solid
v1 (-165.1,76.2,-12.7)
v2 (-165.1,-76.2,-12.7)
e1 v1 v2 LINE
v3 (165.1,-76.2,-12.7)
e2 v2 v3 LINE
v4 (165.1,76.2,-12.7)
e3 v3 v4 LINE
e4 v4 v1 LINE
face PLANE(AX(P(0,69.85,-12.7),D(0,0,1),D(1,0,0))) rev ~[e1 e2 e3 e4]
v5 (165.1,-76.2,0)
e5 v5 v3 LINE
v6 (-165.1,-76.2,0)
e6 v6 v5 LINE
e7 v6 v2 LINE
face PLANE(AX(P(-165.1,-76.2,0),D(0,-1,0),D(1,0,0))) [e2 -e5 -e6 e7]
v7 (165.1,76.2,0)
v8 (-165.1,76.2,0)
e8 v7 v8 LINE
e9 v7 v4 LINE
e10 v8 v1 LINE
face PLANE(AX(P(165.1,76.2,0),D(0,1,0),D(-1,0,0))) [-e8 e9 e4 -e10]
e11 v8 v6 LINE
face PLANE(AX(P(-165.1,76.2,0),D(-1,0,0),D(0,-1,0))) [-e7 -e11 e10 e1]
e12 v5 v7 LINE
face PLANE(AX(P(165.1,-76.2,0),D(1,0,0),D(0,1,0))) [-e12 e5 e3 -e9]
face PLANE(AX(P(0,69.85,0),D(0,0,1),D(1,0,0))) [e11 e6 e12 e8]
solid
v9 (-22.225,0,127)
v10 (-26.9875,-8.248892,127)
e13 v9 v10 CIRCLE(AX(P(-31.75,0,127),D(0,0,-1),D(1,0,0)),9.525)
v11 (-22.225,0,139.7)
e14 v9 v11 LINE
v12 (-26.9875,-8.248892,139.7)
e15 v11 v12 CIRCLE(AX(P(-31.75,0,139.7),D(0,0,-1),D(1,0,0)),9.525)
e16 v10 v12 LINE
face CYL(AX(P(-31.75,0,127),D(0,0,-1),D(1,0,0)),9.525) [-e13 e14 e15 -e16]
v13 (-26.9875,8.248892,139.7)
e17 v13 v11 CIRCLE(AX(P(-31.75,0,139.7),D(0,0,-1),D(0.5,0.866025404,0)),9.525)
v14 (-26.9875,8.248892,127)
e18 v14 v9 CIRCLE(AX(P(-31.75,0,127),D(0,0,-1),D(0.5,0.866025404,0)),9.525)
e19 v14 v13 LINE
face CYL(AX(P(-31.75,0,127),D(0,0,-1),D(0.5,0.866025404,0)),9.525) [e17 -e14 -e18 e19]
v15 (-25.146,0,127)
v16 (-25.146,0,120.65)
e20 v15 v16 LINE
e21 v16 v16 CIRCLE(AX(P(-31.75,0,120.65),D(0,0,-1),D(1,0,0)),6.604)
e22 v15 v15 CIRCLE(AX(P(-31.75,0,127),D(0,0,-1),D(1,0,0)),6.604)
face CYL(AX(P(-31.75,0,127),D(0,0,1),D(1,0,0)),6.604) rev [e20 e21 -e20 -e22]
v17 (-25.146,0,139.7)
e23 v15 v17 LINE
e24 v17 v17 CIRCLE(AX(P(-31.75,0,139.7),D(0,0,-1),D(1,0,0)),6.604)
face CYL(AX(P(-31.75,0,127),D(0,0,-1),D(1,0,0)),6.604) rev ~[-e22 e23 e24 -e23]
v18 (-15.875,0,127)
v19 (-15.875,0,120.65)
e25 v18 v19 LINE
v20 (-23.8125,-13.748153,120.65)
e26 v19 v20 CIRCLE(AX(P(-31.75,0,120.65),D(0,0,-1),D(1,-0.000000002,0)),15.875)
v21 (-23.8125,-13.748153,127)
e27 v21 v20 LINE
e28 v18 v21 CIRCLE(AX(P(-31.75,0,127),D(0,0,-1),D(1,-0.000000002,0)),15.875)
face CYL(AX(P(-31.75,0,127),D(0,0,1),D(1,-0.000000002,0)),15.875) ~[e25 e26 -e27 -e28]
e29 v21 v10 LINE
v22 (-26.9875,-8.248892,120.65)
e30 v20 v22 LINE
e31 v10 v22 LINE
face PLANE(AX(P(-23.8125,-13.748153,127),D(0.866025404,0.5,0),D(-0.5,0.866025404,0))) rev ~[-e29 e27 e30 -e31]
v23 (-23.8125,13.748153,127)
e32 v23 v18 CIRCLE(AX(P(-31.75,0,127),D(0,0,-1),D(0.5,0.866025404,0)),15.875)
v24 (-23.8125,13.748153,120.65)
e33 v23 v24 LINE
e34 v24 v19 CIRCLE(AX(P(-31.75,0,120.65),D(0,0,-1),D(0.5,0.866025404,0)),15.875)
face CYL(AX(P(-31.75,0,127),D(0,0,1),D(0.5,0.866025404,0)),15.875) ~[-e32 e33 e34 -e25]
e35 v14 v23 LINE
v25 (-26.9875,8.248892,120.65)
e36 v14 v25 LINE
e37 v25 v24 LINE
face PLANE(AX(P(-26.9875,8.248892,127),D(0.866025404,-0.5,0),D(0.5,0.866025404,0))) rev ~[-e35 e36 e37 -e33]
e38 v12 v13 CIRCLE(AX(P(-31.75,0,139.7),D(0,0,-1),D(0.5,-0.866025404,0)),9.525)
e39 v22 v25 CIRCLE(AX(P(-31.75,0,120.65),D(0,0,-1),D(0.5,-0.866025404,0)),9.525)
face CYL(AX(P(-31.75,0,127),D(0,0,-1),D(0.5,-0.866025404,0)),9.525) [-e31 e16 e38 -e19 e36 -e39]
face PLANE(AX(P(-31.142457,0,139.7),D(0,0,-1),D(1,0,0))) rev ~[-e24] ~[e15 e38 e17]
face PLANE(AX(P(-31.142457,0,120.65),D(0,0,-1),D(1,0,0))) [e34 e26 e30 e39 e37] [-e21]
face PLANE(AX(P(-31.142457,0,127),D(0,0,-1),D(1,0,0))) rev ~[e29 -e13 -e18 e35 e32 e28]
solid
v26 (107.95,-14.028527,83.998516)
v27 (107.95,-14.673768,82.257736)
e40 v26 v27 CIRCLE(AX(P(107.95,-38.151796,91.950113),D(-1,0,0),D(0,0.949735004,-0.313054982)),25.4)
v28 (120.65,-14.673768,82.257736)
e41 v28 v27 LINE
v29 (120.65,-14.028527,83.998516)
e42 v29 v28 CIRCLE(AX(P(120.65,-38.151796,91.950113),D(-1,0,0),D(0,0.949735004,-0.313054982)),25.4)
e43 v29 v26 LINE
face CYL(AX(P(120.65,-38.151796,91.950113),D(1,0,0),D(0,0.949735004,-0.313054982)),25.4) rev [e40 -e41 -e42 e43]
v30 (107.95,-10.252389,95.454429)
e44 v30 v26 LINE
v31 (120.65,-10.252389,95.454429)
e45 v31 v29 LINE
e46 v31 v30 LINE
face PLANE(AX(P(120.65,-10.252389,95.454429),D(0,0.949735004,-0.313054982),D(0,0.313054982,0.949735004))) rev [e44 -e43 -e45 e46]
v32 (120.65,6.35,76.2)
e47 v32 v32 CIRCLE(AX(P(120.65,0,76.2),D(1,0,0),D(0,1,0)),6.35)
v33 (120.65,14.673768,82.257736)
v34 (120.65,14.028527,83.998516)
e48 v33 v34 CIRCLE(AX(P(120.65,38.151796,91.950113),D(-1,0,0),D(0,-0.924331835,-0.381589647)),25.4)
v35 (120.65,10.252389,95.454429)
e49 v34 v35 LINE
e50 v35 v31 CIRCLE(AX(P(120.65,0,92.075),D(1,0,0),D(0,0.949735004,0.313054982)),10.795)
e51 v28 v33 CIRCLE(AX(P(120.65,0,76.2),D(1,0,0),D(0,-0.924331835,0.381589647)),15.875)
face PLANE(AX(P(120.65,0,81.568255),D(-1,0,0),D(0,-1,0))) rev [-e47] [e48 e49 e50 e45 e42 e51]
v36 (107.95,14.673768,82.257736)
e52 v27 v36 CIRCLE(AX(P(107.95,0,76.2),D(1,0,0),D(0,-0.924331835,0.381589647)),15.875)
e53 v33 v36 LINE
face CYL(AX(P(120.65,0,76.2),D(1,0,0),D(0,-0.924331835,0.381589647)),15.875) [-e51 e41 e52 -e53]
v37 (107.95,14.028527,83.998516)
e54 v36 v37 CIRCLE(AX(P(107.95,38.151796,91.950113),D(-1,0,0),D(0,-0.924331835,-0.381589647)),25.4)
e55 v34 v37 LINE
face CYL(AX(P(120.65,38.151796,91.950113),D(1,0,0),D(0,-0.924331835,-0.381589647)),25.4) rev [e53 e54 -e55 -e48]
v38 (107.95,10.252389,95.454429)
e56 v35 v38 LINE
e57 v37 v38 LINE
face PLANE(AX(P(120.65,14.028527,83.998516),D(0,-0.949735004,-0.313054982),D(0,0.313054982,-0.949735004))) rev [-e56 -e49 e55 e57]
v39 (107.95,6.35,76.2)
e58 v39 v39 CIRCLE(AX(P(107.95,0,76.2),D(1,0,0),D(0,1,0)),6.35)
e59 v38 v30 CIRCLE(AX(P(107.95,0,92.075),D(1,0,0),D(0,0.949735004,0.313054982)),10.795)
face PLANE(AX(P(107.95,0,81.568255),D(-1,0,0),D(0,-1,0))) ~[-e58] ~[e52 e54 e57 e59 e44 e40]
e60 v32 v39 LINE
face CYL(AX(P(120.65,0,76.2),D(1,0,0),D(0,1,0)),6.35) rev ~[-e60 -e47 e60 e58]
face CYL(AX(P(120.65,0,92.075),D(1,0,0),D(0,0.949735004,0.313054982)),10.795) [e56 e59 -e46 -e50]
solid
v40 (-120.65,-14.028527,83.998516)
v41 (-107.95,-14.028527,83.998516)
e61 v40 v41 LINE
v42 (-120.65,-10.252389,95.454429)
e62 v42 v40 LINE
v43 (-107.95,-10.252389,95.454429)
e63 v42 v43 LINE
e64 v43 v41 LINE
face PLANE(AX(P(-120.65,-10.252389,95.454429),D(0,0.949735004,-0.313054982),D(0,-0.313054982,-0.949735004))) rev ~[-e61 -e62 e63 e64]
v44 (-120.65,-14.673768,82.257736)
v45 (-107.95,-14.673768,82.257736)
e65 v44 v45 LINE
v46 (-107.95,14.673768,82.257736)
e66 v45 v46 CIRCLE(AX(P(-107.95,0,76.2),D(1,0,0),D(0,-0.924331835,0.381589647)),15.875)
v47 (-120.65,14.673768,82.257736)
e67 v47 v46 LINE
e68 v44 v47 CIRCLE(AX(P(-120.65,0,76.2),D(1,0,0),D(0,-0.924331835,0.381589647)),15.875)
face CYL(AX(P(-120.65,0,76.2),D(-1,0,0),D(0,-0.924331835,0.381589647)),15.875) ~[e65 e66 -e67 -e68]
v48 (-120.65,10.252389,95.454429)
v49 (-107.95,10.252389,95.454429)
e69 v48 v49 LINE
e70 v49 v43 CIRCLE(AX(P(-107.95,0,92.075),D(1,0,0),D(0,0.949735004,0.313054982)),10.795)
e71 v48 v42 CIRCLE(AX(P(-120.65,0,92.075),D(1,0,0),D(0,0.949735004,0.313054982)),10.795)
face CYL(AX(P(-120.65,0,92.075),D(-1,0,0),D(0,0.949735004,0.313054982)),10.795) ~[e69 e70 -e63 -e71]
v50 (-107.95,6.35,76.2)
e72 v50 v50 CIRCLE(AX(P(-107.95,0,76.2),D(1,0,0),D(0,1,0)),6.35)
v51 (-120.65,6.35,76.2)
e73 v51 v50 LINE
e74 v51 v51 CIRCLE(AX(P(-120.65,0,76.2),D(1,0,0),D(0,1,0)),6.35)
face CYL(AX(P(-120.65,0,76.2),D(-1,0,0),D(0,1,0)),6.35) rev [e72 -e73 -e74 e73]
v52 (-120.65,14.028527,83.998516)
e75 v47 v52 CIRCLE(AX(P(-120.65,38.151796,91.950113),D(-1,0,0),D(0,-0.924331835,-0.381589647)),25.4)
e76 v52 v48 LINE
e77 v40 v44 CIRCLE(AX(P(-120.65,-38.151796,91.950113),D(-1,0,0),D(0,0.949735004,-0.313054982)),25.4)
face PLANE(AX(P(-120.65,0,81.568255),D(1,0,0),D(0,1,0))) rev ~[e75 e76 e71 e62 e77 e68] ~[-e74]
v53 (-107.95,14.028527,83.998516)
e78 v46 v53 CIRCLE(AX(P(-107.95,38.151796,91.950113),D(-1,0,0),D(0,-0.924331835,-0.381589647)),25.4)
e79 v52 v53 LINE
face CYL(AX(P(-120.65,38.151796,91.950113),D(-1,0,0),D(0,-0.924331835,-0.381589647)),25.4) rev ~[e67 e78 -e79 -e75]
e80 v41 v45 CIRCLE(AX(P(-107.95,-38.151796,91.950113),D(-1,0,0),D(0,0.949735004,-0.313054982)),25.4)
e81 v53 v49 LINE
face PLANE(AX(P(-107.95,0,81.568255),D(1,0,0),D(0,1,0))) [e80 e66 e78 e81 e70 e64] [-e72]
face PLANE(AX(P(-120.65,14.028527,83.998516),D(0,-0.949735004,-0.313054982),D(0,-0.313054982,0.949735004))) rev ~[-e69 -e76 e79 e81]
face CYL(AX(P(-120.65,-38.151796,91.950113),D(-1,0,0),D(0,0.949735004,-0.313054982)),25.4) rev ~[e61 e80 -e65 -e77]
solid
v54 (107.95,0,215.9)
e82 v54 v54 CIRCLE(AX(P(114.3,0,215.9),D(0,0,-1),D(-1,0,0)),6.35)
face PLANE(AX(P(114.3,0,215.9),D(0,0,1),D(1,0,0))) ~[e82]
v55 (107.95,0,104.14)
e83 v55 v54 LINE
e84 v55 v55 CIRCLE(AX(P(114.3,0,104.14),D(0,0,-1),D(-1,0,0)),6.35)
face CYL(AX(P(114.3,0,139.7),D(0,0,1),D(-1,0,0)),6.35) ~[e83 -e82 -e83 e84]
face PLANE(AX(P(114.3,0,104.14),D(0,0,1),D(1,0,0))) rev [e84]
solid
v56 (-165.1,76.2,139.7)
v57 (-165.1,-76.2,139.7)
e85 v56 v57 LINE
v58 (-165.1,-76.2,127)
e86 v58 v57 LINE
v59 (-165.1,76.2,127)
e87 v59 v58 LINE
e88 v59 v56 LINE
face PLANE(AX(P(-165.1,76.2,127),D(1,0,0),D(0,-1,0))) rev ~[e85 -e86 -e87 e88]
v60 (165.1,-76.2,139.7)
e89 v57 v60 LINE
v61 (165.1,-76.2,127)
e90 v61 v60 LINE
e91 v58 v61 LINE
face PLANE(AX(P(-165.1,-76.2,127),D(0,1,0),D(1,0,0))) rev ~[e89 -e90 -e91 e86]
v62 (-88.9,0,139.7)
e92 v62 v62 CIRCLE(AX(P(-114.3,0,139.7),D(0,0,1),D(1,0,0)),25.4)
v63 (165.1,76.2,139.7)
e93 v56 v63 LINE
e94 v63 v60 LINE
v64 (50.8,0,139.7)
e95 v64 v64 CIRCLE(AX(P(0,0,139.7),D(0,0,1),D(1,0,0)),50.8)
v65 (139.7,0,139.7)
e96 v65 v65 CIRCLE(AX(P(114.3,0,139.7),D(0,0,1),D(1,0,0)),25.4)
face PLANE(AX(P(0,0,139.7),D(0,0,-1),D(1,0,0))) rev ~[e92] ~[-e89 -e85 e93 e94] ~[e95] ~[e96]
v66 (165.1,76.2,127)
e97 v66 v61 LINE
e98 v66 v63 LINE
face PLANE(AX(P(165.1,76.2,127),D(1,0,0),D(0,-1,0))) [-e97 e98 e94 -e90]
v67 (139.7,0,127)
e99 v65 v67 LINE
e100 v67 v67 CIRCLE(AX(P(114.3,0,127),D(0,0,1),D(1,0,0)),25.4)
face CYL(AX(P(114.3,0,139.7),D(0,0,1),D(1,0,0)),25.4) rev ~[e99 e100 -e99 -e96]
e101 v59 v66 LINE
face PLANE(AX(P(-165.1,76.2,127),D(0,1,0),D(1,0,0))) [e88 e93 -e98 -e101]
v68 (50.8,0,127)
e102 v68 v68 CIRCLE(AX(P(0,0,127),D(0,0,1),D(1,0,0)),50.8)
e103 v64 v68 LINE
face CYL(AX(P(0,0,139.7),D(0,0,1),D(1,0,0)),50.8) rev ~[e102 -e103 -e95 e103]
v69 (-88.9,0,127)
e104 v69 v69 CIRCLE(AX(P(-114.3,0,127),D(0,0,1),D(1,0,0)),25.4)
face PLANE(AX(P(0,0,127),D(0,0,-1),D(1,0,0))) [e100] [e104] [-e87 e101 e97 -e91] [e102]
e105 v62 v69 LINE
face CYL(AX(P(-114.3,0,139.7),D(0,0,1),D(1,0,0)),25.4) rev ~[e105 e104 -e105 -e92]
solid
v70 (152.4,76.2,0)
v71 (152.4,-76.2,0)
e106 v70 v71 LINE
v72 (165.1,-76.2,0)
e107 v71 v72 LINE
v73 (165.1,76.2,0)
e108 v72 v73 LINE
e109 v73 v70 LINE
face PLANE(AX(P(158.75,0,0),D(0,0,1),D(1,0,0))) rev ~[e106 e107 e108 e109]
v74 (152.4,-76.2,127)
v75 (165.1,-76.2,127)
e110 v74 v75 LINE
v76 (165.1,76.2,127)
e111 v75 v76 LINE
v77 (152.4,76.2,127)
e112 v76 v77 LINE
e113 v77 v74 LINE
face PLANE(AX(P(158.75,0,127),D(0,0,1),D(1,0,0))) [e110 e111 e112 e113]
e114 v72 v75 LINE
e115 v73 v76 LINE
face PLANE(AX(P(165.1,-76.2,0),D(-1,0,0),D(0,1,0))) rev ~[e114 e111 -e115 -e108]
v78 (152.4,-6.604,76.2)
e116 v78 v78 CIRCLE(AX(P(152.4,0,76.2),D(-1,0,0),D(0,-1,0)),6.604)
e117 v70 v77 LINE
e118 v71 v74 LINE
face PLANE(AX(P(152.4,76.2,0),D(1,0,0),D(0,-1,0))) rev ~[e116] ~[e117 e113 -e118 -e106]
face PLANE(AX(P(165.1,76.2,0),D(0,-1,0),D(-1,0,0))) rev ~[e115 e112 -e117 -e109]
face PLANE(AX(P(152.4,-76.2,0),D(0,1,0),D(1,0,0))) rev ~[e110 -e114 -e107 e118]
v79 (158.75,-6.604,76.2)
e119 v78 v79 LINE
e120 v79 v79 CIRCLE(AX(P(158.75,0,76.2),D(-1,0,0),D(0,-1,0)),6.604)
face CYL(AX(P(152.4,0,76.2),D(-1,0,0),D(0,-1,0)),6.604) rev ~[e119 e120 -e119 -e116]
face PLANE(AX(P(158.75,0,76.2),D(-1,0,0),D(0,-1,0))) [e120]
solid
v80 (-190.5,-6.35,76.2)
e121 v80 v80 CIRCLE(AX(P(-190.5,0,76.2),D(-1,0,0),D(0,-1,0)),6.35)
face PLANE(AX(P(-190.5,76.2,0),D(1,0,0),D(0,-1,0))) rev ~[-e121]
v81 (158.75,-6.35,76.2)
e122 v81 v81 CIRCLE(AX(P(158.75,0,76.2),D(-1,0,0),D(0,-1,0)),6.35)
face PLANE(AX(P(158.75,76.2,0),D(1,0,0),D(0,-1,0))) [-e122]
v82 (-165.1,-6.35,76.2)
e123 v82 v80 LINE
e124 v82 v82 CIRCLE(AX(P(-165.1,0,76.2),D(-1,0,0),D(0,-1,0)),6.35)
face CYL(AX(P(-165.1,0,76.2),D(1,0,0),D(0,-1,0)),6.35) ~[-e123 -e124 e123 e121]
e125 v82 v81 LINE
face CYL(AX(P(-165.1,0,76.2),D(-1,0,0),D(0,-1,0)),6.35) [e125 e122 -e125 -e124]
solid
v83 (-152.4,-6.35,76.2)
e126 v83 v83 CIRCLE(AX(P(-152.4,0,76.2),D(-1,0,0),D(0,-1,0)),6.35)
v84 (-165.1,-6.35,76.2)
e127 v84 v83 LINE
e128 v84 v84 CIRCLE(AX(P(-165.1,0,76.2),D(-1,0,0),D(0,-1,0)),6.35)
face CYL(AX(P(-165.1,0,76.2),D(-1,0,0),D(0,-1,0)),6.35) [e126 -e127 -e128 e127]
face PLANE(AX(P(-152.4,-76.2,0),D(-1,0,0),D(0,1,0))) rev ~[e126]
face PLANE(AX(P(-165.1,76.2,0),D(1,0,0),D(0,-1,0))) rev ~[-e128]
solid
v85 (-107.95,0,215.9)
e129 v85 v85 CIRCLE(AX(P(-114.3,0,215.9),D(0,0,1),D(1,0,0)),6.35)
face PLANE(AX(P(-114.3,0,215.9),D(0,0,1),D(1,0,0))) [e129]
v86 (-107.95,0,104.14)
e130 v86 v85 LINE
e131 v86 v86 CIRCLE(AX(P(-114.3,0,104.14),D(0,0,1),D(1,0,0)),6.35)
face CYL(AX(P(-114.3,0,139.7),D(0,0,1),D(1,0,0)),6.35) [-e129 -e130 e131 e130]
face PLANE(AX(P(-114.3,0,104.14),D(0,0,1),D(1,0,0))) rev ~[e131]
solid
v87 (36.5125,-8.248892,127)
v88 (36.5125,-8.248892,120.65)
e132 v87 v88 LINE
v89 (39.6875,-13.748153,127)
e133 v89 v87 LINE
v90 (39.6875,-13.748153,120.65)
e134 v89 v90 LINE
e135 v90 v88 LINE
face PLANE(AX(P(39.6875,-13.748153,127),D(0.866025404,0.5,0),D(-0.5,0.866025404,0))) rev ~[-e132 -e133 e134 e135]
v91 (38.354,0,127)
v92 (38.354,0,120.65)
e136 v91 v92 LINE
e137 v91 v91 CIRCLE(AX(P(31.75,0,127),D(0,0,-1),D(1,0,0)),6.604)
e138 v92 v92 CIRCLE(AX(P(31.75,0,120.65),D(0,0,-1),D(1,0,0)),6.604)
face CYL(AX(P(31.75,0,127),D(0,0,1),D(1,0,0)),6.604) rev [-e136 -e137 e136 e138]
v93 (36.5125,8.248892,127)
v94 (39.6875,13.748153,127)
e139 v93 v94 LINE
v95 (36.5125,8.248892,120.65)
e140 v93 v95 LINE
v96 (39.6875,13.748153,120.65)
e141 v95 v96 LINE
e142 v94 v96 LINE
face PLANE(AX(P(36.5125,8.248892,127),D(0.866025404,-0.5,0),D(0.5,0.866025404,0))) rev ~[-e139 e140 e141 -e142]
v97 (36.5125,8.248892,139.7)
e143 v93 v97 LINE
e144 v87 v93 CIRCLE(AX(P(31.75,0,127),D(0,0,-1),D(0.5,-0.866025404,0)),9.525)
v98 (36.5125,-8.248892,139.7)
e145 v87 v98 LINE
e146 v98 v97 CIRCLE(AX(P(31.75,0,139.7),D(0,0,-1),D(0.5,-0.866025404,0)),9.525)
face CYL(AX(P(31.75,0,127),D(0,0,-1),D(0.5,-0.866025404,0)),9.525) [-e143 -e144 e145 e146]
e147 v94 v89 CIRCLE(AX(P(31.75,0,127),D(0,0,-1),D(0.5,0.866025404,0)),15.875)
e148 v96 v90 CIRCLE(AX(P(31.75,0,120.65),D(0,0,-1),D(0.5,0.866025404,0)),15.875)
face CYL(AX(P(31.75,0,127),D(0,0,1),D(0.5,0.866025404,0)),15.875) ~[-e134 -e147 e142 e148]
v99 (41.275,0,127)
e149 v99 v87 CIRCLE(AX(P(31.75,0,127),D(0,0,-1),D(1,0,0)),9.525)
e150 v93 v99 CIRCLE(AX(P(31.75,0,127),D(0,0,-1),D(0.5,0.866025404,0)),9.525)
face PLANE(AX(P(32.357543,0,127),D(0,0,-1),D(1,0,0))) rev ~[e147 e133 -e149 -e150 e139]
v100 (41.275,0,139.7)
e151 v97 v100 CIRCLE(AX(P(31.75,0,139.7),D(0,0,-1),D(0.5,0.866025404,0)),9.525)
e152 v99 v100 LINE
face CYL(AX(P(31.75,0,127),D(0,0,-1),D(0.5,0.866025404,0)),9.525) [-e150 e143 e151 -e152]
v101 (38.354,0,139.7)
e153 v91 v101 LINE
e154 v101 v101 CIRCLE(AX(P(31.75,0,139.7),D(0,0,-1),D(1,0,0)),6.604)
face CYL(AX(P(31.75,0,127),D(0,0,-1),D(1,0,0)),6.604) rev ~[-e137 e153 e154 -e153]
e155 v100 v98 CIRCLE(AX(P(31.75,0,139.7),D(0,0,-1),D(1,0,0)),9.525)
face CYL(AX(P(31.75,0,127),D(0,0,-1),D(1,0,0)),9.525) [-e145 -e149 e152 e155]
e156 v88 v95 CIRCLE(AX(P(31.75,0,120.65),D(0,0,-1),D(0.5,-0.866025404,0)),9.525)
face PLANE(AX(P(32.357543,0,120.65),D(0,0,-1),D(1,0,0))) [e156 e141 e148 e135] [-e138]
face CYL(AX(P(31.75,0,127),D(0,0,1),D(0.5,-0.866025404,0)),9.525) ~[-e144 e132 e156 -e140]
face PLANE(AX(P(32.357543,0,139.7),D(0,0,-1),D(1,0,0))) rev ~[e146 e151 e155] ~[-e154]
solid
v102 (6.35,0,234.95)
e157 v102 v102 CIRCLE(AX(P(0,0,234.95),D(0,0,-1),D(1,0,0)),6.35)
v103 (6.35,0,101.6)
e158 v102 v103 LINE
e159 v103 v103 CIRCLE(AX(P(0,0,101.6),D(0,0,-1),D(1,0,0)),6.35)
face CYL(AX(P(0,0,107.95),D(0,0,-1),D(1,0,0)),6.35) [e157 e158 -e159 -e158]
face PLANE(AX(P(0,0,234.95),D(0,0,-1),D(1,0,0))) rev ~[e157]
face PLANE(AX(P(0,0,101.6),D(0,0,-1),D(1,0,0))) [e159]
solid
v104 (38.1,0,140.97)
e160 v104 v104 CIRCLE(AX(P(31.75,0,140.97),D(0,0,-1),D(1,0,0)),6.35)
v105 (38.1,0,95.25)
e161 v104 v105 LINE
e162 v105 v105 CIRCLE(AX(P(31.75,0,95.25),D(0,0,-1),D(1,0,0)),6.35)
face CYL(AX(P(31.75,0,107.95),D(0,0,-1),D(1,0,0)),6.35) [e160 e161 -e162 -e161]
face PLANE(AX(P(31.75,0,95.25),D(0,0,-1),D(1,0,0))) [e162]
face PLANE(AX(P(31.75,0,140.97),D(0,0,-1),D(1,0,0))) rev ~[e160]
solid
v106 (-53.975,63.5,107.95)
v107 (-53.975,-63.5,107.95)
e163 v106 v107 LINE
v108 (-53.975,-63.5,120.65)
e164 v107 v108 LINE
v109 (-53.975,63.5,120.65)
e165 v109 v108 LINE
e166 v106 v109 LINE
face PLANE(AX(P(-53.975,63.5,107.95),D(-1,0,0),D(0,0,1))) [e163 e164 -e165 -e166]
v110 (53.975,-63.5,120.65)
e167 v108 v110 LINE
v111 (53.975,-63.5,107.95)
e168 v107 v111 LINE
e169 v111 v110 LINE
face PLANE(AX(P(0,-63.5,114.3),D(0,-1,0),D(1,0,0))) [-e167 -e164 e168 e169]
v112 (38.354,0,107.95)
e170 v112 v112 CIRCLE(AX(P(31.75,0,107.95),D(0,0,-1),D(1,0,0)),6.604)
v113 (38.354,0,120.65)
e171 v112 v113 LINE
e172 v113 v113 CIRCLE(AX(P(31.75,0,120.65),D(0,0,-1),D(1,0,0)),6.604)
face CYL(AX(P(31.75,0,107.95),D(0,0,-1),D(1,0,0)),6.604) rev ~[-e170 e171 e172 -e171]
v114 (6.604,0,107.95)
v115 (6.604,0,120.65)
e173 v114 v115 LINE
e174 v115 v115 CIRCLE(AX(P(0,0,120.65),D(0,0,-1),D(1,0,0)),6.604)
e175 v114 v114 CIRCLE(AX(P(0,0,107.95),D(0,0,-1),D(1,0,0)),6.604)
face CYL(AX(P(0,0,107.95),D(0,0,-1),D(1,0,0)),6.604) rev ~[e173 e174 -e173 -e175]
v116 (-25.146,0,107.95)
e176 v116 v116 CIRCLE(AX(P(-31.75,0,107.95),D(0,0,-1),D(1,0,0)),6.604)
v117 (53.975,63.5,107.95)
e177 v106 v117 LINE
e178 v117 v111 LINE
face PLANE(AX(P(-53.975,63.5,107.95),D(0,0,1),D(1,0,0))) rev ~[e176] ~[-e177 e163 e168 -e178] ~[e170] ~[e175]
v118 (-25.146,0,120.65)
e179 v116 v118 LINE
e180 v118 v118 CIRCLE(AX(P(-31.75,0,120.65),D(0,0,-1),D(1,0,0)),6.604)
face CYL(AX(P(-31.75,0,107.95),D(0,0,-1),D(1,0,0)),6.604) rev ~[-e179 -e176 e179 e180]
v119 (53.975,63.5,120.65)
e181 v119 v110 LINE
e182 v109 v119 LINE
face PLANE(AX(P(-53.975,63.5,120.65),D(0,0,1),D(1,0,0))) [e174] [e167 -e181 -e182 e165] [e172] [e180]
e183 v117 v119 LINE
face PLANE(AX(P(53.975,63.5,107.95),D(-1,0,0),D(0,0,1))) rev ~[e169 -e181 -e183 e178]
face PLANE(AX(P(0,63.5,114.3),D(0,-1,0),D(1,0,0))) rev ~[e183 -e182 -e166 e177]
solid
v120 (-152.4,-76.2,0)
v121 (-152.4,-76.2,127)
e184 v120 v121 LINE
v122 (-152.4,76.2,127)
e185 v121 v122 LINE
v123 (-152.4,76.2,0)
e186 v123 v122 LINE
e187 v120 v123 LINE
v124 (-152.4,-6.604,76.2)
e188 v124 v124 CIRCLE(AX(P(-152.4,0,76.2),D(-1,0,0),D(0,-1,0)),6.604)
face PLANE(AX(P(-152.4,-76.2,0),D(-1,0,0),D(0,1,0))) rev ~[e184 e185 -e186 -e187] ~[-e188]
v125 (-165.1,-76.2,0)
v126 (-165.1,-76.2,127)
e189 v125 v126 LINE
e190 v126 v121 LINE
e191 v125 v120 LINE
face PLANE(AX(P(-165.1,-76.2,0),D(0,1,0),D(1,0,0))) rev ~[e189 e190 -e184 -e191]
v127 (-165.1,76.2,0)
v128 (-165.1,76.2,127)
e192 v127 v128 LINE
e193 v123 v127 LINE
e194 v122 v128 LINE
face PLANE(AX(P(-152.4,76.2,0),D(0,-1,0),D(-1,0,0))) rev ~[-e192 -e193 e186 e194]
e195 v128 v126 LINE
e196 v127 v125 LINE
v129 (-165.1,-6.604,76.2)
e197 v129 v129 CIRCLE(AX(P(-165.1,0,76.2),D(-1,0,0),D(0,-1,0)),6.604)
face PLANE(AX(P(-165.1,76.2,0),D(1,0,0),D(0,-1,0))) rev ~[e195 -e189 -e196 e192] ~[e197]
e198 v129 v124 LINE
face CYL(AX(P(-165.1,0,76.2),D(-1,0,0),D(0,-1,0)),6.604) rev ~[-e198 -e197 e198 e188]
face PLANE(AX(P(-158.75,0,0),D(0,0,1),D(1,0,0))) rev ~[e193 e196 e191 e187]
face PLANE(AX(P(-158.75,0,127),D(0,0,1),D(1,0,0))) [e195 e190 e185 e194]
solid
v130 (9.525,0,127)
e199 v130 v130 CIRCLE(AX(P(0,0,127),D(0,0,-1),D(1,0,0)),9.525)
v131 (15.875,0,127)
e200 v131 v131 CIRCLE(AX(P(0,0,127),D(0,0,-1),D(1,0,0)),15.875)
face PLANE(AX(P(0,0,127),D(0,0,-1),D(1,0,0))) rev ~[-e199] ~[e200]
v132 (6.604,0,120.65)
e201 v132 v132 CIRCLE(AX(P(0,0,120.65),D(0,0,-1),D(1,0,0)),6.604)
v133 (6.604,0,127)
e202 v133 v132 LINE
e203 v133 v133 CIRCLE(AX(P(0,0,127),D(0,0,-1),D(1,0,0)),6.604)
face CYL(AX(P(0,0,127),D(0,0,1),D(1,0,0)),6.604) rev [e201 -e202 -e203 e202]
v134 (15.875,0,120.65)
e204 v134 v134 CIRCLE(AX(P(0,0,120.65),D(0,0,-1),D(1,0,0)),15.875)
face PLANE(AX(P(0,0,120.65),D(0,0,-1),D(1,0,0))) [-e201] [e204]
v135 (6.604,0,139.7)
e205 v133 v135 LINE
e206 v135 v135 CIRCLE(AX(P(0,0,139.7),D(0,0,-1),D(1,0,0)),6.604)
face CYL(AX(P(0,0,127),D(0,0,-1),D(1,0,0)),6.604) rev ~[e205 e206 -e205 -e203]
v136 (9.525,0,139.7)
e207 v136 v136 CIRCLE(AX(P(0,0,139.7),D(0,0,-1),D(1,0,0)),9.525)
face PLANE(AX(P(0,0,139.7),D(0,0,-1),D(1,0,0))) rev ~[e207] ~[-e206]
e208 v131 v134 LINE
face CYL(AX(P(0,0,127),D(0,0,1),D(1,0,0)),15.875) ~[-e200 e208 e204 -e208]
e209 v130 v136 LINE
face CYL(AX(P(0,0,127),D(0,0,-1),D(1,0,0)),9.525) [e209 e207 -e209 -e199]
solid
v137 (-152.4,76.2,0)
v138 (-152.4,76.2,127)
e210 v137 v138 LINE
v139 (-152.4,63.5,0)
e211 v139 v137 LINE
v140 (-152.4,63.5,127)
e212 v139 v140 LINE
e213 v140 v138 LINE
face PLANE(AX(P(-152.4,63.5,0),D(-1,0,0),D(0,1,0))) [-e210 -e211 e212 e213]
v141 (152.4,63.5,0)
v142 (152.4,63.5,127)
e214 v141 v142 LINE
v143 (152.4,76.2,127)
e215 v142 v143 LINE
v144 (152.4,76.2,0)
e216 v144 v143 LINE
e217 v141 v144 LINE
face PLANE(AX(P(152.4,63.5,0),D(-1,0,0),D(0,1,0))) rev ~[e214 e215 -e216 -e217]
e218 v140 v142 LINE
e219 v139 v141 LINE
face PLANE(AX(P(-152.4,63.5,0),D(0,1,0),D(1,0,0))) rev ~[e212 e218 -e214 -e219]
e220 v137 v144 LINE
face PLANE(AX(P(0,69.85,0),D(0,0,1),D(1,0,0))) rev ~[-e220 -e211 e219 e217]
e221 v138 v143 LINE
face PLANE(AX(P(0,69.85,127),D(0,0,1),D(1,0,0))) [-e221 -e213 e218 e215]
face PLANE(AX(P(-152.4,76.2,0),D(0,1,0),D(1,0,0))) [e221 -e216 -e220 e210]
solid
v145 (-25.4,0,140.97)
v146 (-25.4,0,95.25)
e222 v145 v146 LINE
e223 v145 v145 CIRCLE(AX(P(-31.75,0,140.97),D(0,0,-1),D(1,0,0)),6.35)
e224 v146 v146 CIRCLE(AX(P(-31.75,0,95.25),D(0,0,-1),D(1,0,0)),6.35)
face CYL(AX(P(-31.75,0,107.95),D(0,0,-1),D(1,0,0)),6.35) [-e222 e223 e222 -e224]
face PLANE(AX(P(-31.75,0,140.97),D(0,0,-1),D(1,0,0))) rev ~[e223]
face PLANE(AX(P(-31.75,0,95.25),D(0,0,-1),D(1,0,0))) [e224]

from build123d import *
from build123d import SkipClean  # not in build123d's __all__

# Parameters (mm, degrees)
F0_W           = 304.8
F0_H           = 12.7
F0_H_2         = 127
F1_DEPTH       = 12.7
F2_DEPTH       = 127
F3_DEPTH       = 127
F4_DEPTH       = 127
F5_START       = -139.7
F1_FACE_W      = 330.2
F1_FACE_H      = 152.4
F5_DEPTH       = 12.7
F6_R           = 25.4
F6_R_2         = 50.8
F7_DEPTH       = 12.7
F8_R           = 6.604
F8_R_2         = 6.35
F9_DEPTH       = 12.7
F10_R          = 6.604
F11_DEPTH      = 6.35
F12_DEPTH      = 323.85
F12_DEPTH_BACK = 25.4
F14_START      = 31.75
F13_R          = 6.35
F14_DEPTH      = 12.7
F15_R          = 6.604
F16_DEPTH      = 6.35
F15_R_2        = 9.525
F17_DEPTH      = 12.7
F18_W          = 107.95
F18_H          = 12.7
F19_DEPTH      = 127
F20_R          = 6.604
F21_DEPTH      = 12.7
F22_R          = 6.35
F23_DEPTH      = 12.7
F23_DEPTH_BACK = 33.02
F24_DEPTH      = 6.35
F24_DEPTH_BACK = 127
F25_R          = 6.35
F26_DEPTH      = 76.2
F26_DEPTH_BACK = 35.56


# Not quite as in the source:
# - a pattern or mirror of a feature is missing from the dataset's text; its kind, count and spacing are read off the source's solid


with BuildPart() as f1:
    # F0 (on Top) → F1 (new body)
    with BuildSketch(Plane.XY):
        with Locations((0, 69.85)):
            Rectangle(F0_W, F0_H)
        Polygon((-152.4, 76.2), (-165.1, 76.2), (-165.1, -76.2), (-152.4, -76.2), (-152.4, -63.5), (-152.4, 63.5), align=None)
        Rectangle(F0_W, F0_H_2)
        with Locations((0, -69.85)):
            Rectangle(F0_W, F0_H)
        Polygon((165.1, 76.2), (152.4, 76.2), (152.4, 63.5), (152.4, -63.5), (152.4, -76.2), (165.1, -76.2), align=None)
    extrude(amount=-F1_DEPTH)


with BuildPart() as f2:
    # F0 (on Top) → F2 (new body)
    with BuildSketch(Plane.XY):
        with Locations((0, 69.85)):
            Rectangle(F0_W, F0_H)
    extrude(amount=F2_DEPTH)


with BuildPart() as f3:
    # F0 (on Top) → F3 (new body)
    with BuildSketch(Plane.XY):
        Polygon((-152.4, 76.2), (-165.1, 76.2), (-165.1, -76.2), (-152.4, -76.2), (-152.4, -63.5), (-152.4, 63.5), align=None)
    extrude(amount=F3_DEPTH)

    # F8 (on face) → F9 (cut)
    with BuildSketch(Plane(origin=(-165.1, 0, 0), x_dir=(0, -1, 0), z_dir=(-1, 0, 0))):
        with Locations((0, 76.2)):
            Circle(F8_R)
        with Locations((0, 76.2)):
            Circle(F8_R_2, mode=Mode.SUBTRACT)
    extrude(amount=-F9_DEPTH, mode=Mode.SUBTRACT)


with BuildPart() as f4:
    # F0 (on Top) → F4 (new body)
    with BuildSketch(Plane.XY):
        Polygon((165.1, 76.2), (152.4, 76.2), (152.4, 63.5), (152.4, -63.5), (152.4, -76.2), (165.1, -76.2), align=None)
    extrude(amount=F4_DEPTH)

    # F10 (on face) → F11 (cut)
    with BuildSketch(Plane(origin=(152.4, 0, 0), x_dir=(0, -1, 0), z_dir=(-1, 0, 0))):
        with Locations((0, 76.2)):
            Circle(F10_R)
    extrude(amount=-F11_DEPTH, mode=Mode.SUBTRACT)


with BuildPart() as f5:
    # F1_face (on face) → F5 (new body)
    with BuildSketch(Plane(origin=(0, 0, -12.7), x_dir=(1, 0, 0), z_dir=(0, 0, -1)).offset(F5_START)):
        Rectangle(F1_FACE_W, F1_FACE_H)
    extrude(amount=-F5_DEPTH)

    # F6 (on face) → F7 (cut)
    with BuildSketch(Plane.XY.offset(139.7)):
        with Locations((-114.3, 0)):
            Circle(F6_R)
        Circle(F6_R_2)
        with Locations((114.3, 0)):
            Circle(F6_R)
    extrude(amount=-F7_DEPTH, mode=Mode.SUBTRACT)


with BuildPart() as f12:
    # F12 (new, two sides): a face of the model
    f12_faces = [f3.part.faces().sort_by_distance(p)[0] for p in [
        (-165.1, 0, 76.2),
    ]]
    extrude(f12_faces, amount=-F12_DEPTH)
    extrude(f12_faces, amount=F12_DEPTH_BACK)


with BuildPart() as f14:
    # F13 (on face) → F14 (new body)
    with BuildSketch(Plane.YZ.offset(-152.4).offset(F14_START)):
        with BuildLine():
            ThreePointArc((-14.0285273832, 83.9985161394), (-14.335237854, 83.122228751), (-14.67376788, 82.25773565))
            ThreePointArc((-14.67376788, 82.25773565), (0, 60.325), (14.67376788, 82.25773565))
            ThreePointArc((14.67376788, 82.25773565), (14.335237854, 83.122228751), (14.0285273832, 83.9985161394))
            Line((14.0285273832, 83.9985161394), (10.2523893695, 95.454428534))
            ThreePointArc((10.2523893695, 95.454428534), (0, 102.87), (-10.2523893695, 95.454428534))
            Line((-10.2523893695, 95.454428534), (-14.0285273832, 83.9985161394))
        make_face()
        with Locations((0, 76.2)):
            Circle(F13_R, mode=Mode.SUBTRACT)
    extrude(amount=F14_DEPTH)


with BuildPart() as f14_copies_1:
    # F14_copies: instance of F14
    add(f14.part.mirror(Plane(origin=(0, 0, 0), x_dir=(0, 0, 1), z_dir=(1, 0, 0))), clean=False)


with BuildPart() as f16:
    # F15 (on face) → F16 (new body)
    with BuildSketch(Plane(origin=(0, 0, 127), x_dir=(1, 0, 0), z_dir=(0, 0, -1))):
        with BuildLine():
            ThreePointArc((-26.9875, 8.248891971), (-41.275, 0), (-26.9875, -8.248891971))
            ThreePointArc((-26.9875, -8.248891971), (-23.501108029, -4.7625), (-22.225, 0))
            ThreePointArc((-22.225, 0), (-23.501108029, 4.7625), (-26.9875, 8.248891971))
        make_face()
        with Locations((-31.75, 0)):
            Circle(F15_R, mode=Mode.SUBTRACT)
        with BuildLine():
            ThreePointArc((-23.8125, -13.7481532851), (-18.0018467087, -7.9374999892), (-15.875, 2.48e-08))
            ThreePointArc((-15.875, 2.48e-08), (-18.0018467211, 7.9375000108), (-23.8125, 13.7481532851))
            Line((-23.8125, 13.7481532851), (-26.9875, 8.248891971))
            ThreePointArc((-26.9875, 8.248891971), (-23.501108029, 4.7625), (-22.225, 0))
            ThreePointArc((-22.225, 0), (-23.501108029, -4.7625), (-26.9875, -8.248891971))
            Line((-26.9875, -8.248891971), (-23.8125, -13.7481532851))
        make_face()
    extrude(amount=F16_DEPTH)

    # F15 (on face) → F17 (join)
    with BuildSketch(Plane(origin=(0, 0, 127), x_dir=(1, 0, 0), z_dir=(0, 0, -1))):
        with BuildLine():
            ThreePointArc((-26.9875, 8.248891971), (-41.275, 0), (-26.9875, -8.248891971))
            ThreePointArc((-26.9875, -8.248891971), (-23.501108029, -4.7625), (-22.225, 0))
            ThreePointArc((-22.225, 0), (-23.501108029, 4.7625), (-26.9875, 8.248891971))
        make_face()
        with Locations((-31.75, 0)):
            Circle(F15_R, mode=Mode.SUBTRACT)
    extrude(amount=-F17_DEPTH)


with BuildPart() as f16b:
    # F15 (on face) → F16, piece 2 (new body)
    with BuildSketch(Plane(origin=(0, 0, 127), x_dir=(1, 0, 0), z_dir=(0, 0, -1))):
        with BuildLine():
            ThreePointArc((-15.875, 2.48e-08), (-1.24e-08, -15.875), (15.875, 0))
            ThreePointArc((15.875, 0), (1.24e-08, 15.875), (-15.875, 2.48e-08))
        make_face()
        Circle(F15_R_2, mode=Mode.SUBTRACT)
        Circle(F15_R_2)
        Circle(F15_R, mode=Mode.SUBTRACT)
    extrude(amount=F16_DEPTH)

    # F15 (on face) → F17, piece 2 (join)
    with BuildSketch(Plane(origin=(0, 0, 127), x_dir=(1, 0, 0), z_dir=(0, 0, -1))):
        Circle(F15_R_2)
        Circle(F15_R, mode=Mode.SUBTRACT)
    extrude(amount=-F17_DEPTH)


with BuildPart() as f16c:
    # F15 (on face) → F16, piece 3 (new body)
    with BuildSketch(Plane(origin=(0, 0, 127), x_dir=(1, 0, 0), z_dir=(0, 0, -1))):
        with BuildLine():
            ThreePointArc((36.5125, -8.248891971), (39.998891971, -4.7625), (41.275, 0))
            ThreePointArc((41.275, 0), (39.998891971, 4.7625), (36.5125, 8.248891971))
            ThreePointArc((36.5125, 8.248891971), (22.225, 0), (36.5125, -8.248891971))
        make_face()
        with Locations((31.75, 0)):
            Circle(F15_R, mode=Mode.SUBTRACT)
        with BuildLine():
            ThreePointArc((36.5125, 8.248891971), (39.998891971, 4.7625), (41.275, 0))
            ThreePointArc((41.275, 0), (39.998891971, -4.7625), (36.5125, -8.248891971))
            Line((36.5125, -8.248891971), (39.6875, -13.7481532851))
            ThreePointArc((39.6875, -13.7481532851), (47.625, 0), (39.6875, 13.7481532851))
            Line((39.6875, 13.7481532851), (36.5125, 8.248891971))
        make_face()
    extrude(amount=F16_DEPTH)

    # F15 (on face) → F17, piece 3 (join)
    with BuildSketch(Plane(origin=(0, 0, 127), x_dir=(1, 0, 0), z_dir=(0, 0, -1))):
        with BuildLine():
            ThreePointArc((36.5125, -8.248891971), (39.998891971, -4.7625), (41.275, 0))
            ThreePointArc((41.275, 0), (39.998891971, 4.7625), (36.5125, 8.248891971))
            ThreePointArc((36.5125, 8.248891971), (22.225, 0), (36.5125, -8.248891971))
        make_face()
        with Locations((31.75, 0)):
            Circle(F15_R, mode=Mode.SUBTRACT)
    with SkipClean():  # cleaning this boolean's faces spoils the solid; the shape is the same uncleaned
        extrude(amount=-F17_DEPTH)


with BuildPart() as f19:
    # F18 (on face) → F19 (new body)
    with BuildSketch(Plane.XZ.offset(-63.5)):
        with Locations((0, 114.3)):
            Rectangle(F18_W, F18_H)
    extrude(amount=F19_DEPTH)

    # F20 (on face) → F21 (cut)
    with BuildSketch(Plane(origin=(0, 0, 107.95), x_dir=(1, 0, 0), z_dir=(0, 0, -1))):
        with Locations((-31.75, 0)):
            Circle(F20_R)
        Circle(F20_R)
        with Locations((31.75, 0)):
            Circle(F20_R)
    extrude(amount=-F21_DEPTH, mode=Mode.SUBTRACT)


with BuildPart() as f23:
    # F22 (on face) → F23 (new body, two sides)
    with BuildSketch(Plane(origin=(0, 0, 107.95), x_dir=(1, 0, 0), z_dir=(0, 0, -1))) as f23_sk:
        with Locations((-31.75, 0)):
            Circle(F22_R)
    extrude(amount=F23_DEPTH)
    extrude(f23_sk.sketch, amount=-F23_DEPTH_BACK)


with BuildPart() as f23b:
    # F22 (on face) → F23, piece 2 (new body, two sides)
    with BuildSketch(Plane(origin=(0, 0, 107.95), x_dir=(1, 0, 0), z_dir=(0, 0, -1))) as f23_2_sk:
        with Locations((31.75, 0)):
            Circle(F22_R)
    extrude(amount=F23_DEPTH)
    extrude(f23_2_sk.sketch, amount=-F23_DEPTH_BACK)


with BuildPart() as f24:
    # F22 (on face) → F24 (new body, two sides)
    with BuildSketch(Plane(origin=(0, 0, 107.95), x_dir=(1, 0, 0), z_dir=(0, 0, -1))) as f24_sk:
        Circle(F22_R)
    extrude(amount=F24_DEPTH)
    extrude(f24_sk.sketch, amount=-F24_DEPTH_BACK)


with BuildPart() as f26:
    # F25 (on face) → F26 (new body, two sides)
    with BuildSketch(Plane.XY.offset(139.7)) as f26_sk:
        with Locations((-114.3, 0)):
            Circle(F25_R)
    extrude(amount=F26_DEPTH)
    extrude(f26_sk.sketch, amount=-F26_DEPTH_BACK)


with BuildPart() as f27_1:
    # F27: instance of F26
    add(f26.part.mirror(Plane.YZ), clean=False)


solid = Compound([f1.part, f2.part, f3.part, f4.part, f5.part, f12.part, f14.part, f14_copies_1.part, f16.part, f16b.part, f16c.part, f19.part, f23.part, f23b.part, f24.part, f26.part, f27_1.part])
